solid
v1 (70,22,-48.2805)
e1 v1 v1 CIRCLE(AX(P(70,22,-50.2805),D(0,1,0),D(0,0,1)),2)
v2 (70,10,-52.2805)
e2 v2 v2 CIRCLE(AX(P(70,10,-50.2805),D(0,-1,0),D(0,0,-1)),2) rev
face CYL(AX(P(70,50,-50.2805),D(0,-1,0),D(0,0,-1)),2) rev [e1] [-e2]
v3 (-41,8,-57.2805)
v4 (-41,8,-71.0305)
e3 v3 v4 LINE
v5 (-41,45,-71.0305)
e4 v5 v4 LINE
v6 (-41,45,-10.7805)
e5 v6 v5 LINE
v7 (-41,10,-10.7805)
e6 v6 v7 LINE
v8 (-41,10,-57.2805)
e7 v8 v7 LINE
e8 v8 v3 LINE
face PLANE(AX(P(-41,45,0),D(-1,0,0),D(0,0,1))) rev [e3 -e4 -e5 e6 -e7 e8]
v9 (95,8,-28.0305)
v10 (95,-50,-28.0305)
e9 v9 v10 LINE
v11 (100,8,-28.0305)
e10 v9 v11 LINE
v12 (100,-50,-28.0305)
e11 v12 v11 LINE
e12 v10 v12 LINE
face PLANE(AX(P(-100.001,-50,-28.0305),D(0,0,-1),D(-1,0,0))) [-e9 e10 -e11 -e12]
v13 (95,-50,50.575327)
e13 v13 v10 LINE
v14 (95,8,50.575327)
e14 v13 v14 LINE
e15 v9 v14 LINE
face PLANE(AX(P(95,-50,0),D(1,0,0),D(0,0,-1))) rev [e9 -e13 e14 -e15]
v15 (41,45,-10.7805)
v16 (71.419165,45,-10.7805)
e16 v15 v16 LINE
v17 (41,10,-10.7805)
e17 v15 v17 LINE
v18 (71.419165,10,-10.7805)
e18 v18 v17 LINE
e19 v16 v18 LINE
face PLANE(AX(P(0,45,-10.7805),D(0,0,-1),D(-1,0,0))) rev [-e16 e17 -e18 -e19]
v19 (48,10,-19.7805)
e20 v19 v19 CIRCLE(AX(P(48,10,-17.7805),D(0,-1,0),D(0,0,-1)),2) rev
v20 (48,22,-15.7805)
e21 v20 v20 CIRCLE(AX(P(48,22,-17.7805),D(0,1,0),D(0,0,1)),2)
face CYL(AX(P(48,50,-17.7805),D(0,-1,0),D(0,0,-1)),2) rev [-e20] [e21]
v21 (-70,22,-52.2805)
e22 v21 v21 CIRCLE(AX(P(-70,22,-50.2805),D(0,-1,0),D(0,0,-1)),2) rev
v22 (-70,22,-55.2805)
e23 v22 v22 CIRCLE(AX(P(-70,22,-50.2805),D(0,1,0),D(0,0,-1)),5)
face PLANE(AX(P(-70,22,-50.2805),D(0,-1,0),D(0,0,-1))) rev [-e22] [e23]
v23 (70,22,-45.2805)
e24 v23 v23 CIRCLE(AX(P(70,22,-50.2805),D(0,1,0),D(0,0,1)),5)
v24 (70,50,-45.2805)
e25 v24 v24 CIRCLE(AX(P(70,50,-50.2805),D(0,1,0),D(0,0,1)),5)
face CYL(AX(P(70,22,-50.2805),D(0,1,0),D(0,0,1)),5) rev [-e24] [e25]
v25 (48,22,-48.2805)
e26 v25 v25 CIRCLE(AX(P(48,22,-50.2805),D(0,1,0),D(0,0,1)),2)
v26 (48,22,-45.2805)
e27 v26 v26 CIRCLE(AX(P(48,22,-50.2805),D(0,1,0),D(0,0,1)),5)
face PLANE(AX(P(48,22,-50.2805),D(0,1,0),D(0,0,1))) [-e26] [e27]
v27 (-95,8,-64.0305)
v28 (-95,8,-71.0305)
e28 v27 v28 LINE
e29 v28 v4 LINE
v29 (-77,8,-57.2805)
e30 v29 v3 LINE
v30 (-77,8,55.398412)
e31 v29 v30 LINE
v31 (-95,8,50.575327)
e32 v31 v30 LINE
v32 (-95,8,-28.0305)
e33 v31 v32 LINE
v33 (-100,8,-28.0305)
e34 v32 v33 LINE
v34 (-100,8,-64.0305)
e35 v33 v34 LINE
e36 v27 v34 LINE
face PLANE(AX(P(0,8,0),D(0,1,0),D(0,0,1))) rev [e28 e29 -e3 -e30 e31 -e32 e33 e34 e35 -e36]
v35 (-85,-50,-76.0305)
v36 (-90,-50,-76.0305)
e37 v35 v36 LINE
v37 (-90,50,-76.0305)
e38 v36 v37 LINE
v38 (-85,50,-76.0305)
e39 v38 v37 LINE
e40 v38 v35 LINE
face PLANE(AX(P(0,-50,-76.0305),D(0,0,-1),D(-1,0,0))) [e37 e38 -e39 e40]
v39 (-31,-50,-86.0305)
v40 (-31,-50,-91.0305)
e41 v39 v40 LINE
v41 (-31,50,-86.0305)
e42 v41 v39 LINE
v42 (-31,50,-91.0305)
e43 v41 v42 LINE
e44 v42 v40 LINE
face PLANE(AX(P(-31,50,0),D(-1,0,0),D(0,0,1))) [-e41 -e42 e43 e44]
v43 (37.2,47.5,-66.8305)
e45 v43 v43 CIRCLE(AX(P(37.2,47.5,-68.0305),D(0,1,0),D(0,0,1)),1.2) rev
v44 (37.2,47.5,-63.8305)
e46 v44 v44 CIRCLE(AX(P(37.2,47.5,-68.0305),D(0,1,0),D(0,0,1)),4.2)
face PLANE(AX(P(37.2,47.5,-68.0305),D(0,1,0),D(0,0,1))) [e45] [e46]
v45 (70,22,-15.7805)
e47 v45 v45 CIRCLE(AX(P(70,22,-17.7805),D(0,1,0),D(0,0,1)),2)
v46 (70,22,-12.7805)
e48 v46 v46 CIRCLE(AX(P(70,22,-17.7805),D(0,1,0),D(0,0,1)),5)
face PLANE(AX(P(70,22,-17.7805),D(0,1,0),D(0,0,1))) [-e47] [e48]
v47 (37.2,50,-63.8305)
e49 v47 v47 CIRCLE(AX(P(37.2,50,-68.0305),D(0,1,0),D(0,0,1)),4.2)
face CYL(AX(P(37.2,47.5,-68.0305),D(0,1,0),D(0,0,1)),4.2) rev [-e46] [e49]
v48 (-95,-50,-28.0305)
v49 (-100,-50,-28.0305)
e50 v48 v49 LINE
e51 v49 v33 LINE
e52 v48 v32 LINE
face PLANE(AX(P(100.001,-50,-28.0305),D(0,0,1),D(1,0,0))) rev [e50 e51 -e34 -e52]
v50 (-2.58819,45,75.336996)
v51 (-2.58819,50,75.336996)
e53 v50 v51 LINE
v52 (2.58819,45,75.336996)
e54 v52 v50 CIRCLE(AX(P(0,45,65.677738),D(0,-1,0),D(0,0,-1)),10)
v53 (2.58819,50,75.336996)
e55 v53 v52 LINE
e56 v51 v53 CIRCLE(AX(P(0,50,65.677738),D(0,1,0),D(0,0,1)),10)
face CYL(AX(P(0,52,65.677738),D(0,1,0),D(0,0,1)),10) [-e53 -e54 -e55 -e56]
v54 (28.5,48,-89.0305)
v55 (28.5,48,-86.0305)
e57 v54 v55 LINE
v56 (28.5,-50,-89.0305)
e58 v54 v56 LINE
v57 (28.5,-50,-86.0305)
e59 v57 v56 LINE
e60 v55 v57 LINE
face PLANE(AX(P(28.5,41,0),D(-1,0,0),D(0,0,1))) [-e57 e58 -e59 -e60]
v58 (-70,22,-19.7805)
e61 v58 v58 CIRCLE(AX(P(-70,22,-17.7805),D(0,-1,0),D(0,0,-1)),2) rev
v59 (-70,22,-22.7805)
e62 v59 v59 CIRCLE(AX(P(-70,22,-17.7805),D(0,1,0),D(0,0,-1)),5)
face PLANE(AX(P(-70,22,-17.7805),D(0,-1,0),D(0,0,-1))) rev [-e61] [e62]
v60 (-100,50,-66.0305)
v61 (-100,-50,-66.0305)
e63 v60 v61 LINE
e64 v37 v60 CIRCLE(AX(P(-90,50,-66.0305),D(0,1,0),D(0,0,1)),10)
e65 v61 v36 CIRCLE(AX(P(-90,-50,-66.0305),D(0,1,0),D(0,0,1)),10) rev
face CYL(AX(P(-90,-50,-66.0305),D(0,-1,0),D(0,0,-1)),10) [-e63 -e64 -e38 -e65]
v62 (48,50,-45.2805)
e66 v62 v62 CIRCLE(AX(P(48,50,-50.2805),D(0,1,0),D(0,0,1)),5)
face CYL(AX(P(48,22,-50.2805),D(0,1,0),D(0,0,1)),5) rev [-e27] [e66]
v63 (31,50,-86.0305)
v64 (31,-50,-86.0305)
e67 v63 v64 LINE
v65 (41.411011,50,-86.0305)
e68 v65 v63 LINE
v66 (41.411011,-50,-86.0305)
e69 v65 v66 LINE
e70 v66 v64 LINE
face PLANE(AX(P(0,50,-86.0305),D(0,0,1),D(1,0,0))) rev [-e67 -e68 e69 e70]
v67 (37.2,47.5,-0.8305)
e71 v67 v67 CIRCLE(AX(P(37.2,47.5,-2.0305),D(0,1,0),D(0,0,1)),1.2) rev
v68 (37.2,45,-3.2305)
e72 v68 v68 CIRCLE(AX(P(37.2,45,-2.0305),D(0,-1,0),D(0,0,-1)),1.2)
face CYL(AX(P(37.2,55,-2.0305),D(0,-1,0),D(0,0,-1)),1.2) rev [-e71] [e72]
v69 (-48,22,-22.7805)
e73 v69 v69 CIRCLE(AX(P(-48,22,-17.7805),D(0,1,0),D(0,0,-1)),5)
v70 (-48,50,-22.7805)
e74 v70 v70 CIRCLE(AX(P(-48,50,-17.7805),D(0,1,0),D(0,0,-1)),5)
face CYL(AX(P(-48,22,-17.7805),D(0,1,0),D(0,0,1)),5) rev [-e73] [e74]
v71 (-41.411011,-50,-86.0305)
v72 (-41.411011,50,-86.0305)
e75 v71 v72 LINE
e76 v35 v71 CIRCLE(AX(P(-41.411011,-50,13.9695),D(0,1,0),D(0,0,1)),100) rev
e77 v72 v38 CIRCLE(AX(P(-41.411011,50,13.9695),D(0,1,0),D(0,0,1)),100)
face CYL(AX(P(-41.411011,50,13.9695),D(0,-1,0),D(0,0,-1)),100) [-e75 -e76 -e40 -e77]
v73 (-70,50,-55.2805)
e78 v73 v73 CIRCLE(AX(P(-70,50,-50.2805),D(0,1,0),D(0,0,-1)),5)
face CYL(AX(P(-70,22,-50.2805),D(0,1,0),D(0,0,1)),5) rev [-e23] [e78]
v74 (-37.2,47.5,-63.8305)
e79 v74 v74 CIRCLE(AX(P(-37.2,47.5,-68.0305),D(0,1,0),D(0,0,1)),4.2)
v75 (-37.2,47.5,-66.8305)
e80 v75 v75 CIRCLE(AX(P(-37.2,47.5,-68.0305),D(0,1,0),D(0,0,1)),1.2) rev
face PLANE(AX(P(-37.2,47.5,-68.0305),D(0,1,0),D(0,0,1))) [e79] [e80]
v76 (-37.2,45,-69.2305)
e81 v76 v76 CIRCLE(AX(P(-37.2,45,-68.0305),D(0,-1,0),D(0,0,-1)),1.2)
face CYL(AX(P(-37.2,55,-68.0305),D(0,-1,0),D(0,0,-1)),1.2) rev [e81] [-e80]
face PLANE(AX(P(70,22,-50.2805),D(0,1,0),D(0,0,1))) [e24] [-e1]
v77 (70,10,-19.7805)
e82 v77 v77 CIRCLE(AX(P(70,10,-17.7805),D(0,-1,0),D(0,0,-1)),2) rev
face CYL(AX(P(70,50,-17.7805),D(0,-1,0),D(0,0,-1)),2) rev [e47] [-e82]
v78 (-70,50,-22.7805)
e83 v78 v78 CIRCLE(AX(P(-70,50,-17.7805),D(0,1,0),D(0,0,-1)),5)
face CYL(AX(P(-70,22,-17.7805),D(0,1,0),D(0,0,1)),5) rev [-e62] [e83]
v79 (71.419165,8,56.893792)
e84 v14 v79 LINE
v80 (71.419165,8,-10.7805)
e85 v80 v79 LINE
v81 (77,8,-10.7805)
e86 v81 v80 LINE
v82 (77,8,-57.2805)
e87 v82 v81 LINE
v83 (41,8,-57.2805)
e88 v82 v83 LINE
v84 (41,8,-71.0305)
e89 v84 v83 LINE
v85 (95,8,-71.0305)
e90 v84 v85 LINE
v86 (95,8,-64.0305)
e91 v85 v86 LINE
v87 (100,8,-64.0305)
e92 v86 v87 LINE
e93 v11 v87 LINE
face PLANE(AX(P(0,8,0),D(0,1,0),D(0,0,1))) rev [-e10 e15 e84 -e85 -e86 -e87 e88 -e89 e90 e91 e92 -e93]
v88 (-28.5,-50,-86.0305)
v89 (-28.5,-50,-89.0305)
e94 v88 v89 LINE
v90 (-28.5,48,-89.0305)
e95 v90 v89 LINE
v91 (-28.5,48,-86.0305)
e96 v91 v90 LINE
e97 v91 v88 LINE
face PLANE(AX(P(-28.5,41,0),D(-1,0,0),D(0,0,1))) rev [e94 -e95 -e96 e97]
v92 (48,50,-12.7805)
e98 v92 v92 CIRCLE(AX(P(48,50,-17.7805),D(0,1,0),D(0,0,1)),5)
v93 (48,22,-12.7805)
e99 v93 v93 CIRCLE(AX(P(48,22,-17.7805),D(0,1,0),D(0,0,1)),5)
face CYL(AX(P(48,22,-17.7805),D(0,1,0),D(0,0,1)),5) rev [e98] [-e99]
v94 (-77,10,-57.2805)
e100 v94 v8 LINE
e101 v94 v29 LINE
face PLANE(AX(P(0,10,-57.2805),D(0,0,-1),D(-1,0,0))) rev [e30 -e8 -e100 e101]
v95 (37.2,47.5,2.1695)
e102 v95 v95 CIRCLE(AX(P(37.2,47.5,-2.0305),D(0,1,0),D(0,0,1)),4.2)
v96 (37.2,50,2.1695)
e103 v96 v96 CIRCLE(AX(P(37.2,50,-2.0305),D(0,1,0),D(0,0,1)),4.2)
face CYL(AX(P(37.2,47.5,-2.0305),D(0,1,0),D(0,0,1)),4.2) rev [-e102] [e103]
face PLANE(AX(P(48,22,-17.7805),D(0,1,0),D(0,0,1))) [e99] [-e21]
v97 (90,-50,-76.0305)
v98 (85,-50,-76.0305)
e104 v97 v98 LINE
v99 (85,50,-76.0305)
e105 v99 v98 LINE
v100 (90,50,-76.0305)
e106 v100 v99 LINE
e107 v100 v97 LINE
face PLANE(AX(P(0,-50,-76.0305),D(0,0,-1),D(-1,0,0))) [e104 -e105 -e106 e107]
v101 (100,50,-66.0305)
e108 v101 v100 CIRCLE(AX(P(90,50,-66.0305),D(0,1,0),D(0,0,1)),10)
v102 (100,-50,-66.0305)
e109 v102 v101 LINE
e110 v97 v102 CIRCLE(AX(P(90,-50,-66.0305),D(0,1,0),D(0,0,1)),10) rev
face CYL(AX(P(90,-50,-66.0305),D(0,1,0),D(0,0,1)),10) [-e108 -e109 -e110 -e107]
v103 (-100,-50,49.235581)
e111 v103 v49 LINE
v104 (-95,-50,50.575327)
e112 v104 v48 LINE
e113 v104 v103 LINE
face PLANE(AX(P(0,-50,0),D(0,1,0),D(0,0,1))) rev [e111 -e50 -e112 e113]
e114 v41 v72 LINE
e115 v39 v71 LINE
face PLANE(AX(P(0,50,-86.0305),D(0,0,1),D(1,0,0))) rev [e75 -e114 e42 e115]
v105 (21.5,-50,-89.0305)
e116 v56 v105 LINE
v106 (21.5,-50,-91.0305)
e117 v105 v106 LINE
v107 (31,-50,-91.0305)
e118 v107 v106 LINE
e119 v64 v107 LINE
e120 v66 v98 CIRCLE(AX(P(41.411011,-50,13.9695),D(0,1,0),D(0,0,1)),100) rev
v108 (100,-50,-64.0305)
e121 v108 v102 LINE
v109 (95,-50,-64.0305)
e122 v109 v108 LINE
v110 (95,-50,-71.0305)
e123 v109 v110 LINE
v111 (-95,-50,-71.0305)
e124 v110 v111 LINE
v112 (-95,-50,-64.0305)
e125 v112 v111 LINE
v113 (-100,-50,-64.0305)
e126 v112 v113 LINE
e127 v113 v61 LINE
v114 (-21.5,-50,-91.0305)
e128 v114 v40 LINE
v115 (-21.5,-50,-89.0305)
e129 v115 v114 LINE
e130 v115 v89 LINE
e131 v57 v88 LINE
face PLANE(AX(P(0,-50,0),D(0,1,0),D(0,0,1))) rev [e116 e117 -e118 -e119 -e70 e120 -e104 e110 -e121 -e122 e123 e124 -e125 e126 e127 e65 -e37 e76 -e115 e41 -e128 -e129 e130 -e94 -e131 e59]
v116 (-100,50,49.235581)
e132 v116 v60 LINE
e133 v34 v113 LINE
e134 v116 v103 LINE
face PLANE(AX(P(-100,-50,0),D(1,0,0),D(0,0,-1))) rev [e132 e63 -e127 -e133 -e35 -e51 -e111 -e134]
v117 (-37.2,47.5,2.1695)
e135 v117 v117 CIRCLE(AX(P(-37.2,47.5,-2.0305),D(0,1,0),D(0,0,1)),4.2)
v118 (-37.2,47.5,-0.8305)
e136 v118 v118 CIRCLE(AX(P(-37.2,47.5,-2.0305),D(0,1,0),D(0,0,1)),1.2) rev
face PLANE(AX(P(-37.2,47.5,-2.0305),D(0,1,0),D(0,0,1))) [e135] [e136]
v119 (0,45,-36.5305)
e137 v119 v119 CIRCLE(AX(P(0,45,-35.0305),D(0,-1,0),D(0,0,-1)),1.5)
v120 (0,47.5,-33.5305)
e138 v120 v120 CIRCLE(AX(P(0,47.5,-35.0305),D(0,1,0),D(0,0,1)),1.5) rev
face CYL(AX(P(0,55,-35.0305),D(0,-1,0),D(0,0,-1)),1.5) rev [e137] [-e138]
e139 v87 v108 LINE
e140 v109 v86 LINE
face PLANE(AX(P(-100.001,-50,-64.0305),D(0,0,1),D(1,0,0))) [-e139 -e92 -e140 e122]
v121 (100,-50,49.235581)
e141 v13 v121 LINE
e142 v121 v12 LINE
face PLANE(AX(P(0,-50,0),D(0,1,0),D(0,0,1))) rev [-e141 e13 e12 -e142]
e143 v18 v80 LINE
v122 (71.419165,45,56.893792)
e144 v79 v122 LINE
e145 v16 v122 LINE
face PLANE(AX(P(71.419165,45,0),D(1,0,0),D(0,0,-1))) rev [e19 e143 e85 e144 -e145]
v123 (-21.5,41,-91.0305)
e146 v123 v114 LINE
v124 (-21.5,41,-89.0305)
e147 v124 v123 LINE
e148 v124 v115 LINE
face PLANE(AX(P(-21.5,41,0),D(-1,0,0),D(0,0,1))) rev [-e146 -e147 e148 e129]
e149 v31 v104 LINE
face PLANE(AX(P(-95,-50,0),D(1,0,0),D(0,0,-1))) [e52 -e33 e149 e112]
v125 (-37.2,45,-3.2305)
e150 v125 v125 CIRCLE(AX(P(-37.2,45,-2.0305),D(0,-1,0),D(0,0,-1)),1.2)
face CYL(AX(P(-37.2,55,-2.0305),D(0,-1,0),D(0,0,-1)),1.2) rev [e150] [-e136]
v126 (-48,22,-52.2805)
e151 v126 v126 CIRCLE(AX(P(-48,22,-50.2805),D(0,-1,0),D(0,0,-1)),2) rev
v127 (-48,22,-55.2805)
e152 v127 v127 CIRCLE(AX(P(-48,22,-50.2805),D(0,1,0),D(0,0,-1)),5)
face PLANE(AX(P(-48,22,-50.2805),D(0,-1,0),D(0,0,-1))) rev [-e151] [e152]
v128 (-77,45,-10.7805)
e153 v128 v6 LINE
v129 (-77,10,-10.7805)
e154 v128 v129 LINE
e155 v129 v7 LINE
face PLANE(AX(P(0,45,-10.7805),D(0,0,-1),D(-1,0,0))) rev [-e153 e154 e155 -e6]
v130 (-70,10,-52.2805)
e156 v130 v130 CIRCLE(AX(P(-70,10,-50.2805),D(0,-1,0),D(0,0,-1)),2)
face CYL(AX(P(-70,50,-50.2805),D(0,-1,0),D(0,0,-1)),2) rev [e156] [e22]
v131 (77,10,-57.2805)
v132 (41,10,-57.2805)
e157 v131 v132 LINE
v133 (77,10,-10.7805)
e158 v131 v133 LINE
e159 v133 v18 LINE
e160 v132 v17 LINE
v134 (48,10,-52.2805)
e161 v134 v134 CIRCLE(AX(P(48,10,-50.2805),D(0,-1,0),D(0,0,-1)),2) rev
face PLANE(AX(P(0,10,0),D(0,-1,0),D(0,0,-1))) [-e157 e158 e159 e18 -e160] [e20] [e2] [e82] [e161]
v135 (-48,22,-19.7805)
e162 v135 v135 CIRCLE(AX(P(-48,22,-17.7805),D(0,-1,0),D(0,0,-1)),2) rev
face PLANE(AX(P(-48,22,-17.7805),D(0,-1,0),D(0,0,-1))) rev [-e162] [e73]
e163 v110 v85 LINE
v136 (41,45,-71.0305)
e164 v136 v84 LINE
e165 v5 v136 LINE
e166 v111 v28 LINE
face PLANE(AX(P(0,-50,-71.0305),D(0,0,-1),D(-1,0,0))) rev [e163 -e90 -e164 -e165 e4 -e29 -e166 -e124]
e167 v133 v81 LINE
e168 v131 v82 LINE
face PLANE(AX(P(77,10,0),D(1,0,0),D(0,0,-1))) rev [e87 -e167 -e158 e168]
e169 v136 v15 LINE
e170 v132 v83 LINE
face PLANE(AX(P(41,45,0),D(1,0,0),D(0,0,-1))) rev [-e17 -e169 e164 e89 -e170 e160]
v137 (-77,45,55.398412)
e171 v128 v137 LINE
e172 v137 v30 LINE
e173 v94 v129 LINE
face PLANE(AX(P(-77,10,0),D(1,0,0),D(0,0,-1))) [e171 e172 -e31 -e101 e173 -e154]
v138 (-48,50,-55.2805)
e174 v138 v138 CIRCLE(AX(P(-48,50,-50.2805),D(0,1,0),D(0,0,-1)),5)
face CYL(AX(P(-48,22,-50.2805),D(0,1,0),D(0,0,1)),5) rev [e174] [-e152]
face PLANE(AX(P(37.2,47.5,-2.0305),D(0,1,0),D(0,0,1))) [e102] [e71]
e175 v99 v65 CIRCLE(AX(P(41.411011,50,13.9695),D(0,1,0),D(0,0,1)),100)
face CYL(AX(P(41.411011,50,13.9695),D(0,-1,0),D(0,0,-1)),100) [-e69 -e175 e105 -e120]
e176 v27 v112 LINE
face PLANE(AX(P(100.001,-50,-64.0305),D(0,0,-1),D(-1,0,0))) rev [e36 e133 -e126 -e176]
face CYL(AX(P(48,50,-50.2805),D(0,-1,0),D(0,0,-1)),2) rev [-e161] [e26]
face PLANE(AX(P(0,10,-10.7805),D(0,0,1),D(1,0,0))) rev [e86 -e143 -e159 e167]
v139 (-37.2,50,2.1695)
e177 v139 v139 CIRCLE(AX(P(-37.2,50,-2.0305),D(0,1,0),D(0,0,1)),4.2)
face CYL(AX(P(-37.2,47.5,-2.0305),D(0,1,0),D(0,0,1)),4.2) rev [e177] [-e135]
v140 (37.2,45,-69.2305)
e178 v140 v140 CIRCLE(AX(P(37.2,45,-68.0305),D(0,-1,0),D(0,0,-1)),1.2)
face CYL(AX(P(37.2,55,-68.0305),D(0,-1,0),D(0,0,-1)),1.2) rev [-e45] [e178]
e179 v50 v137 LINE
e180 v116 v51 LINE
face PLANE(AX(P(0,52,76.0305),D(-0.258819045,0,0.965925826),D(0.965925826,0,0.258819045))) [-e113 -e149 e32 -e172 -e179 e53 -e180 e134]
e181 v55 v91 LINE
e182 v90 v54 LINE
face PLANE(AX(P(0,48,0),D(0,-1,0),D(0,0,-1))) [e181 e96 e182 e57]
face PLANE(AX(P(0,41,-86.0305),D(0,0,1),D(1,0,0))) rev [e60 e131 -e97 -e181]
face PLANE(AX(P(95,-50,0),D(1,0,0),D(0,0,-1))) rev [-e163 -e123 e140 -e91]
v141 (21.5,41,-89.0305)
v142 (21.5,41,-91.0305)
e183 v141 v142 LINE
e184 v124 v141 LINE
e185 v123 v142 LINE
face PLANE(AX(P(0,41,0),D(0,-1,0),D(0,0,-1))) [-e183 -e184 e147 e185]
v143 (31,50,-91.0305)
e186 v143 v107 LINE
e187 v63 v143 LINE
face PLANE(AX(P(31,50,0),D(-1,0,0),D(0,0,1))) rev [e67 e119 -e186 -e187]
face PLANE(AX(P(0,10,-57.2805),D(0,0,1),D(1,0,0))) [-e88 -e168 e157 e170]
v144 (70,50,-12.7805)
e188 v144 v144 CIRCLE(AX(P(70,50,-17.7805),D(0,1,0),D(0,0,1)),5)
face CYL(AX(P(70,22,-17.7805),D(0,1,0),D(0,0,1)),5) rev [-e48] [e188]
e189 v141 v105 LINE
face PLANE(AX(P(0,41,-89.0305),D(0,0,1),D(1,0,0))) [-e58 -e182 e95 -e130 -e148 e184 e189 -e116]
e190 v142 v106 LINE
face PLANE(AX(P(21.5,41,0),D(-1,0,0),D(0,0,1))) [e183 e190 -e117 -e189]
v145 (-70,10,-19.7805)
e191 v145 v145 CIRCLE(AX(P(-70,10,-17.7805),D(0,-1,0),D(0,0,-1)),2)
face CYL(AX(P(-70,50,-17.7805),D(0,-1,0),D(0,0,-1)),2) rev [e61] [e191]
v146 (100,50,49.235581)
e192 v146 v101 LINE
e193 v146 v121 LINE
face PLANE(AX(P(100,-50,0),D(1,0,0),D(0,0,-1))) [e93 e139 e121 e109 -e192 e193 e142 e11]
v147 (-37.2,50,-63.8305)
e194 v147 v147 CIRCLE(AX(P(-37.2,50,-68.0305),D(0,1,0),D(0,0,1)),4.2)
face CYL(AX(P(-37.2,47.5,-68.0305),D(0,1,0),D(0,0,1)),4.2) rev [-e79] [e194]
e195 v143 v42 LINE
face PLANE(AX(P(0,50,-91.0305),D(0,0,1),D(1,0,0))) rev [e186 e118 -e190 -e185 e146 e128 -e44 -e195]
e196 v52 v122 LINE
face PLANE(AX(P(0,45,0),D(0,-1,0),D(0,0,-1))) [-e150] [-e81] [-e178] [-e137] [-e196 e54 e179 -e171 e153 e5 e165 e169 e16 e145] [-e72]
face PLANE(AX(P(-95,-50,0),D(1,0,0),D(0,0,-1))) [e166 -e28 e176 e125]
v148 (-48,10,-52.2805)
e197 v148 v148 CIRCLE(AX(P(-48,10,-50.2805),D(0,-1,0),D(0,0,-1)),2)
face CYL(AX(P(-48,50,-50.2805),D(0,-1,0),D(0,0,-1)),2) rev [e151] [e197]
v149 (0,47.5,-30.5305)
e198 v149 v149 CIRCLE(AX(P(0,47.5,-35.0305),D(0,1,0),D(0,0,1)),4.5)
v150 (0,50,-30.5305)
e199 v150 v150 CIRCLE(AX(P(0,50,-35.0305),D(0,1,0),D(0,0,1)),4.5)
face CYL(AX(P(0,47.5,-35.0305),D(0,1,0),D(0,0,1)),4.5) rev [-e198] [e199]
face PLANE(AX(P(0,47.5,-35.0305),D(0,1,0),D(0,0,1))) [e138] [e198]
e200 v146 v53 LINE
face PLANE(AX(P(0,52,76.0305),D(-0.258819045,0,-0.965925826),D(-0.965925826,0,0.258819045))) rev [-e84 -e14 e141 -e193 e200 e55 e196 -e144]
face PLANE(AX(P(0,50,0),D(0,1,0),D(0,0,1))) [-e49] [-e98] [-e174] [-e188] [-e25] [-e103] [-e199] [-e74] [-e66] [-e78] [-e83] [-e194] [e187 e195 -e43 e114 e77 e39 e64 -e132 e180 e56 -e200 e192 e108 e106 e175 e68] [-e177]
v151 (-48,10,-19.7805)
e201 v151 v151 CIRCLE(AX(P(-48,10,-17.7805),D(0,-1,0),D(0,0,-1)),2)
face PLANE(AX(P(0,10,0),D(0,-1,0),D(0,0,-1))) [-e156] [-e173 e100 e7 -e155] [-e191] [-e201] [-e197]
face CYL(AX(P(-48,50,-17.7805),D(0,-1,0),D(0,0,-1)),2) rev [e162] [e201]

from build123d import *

# Parameters (mm, degrees)
BOSS_EXTRUDE1_DEPTH      = 50
BOSS_EXTRUDE1_DEPTH_BACK = 50
SKETCH1_W                = 200
SKETCH1_H                = 152.061
SHELL1_T                 = -5
SKETCH3_W                = 190
SKETCH3_H                = 142.061
BOSS_EXTRUDE2_DEPTH      = 37
CUT_EXTRUDE1_REACH       = 221.729
SKETCH2_W                = 36
SKETCH2_H                = 58
SKETCH4_W                = 36
SKETCH4_H                = 46.5
SKETCH4_R                = 2
CUT_EXTRUDE2_DEPTH       = 2
SKETCH4_3_R              = 2
CUT_EXTRUDE3_DEPTH       = 139.364146115
SKETCH5_W                = 169.952904784
SKETCH5_H                = 5
CUT_EXTRUDE4_DEPTH       = 63
CUT_EXTRUDE5_START       = -37
CUT_EXTRUDE5_DEPTH       = 37
SKETCH9_R                = 1.2
SKETCH9_R_2              = 1.5
CUT_EXTRUDE6_DEPTH       = 10
CUT_EXTRUDE7_DEPTH       = 102
FILLET1_R                = 10
SKETCH11_W               = 62
SKETCH11_H               = 5
BOSS_EXTRUDE3_DEPTH      = 100
SKETCH12_W               = 57
SKETCH12_H               = 3
SKETCH12_W_2             = 43
SKETCH12_H_2             = 2
CUT_EXTRUDE8_DEPTH       = 91
SKETCH13_W               = 57
SKETCH13_H               = 3
CUT_EXTRUDE9_DEPTH       = 7
FILLET2_R                = 10
FILLET3_R                = 100
SKETCH15_R               = 5
CUT_EXTRUDE10_DEPTH      = 28
SKETCH17_R               = 4.2
SKETCH17_R_2             = 4.5
CUT_EXTRUDE11_DEPTH      = 2.5


# Read off the part's stored shape, not the designer's step: Cut-Extrude5
with BuildPart() as part:
    # Sketch1 → Boss-Extrude1 (new, two sides: drawn at the far end of the back side and taken through both)
    with BuildSketch(Plane(origin=(0, 0, 0), x_dir=(1, 0, 0), z_dir=(0, 1, 0)).offset(-BOSS_EXTRUDE1_DEPTH_BACK)):
        Rectangle(SKETCH1_W, SKETCH1_H)
    extrude(amount=BOSS_EXTRUDE1_DEPTH + BOSS_EXTRUDE1_DEPTH_BACK)

    # Shell1
    shell1_openings = [part.faces().sort_by_distance(p)[0] for p in [
        (0, -50, 0),
    ]]
    offset(amount=SHELL1_T, openings=shell1_openings, kind=Kind.INTERSECTION)

    # Sketch3 → Boss-Extrude2 (add)
    with BuildSketch(Plane.XZ.offset(-45)):
        Rectangle(SKETCH3_W, SKETCH3_H)
    extrude(amount=BOSS_EXTRUDE2_DEPTH)

    # Sketch2 → Cut-Extrude1 (cut, up to next)
    with BuildSketch(Plane.ZY.offset(100), mode=Mode.PRIVATE) as cut_extrude1_sk1:
        with Locations((-46.0305, -21)):
            Rectangle(SKETCH2_W, SKETCH2_H)
    cut_extrude1_tool1 = extrude(cut_extrude1_sk1.sketch, amount=-CUT_EXTRUDE1_REACH, mode=Mode.PRIVATE) & part.part
    cut_extrude1 = cut_extrude1_tool1.solids().sort_by_distance((-100, -21, -46.0305))[0]
    add(cut_extrude1, mode=Mode.SUBTRACT)

    # Mirror1: Cut-Extrude1 across plane
    add(cut_extrude1.mirror(Plane(origin=(0, 0, 0), x_dir=(0, 0, 1), z_dir=(1, 0, 0))), mode=Mode.SUBTRACT)

    # Sketch4 → Cut-Extrude2 (cut)
    with BuildSketch(Plane.XZ.offset(-8)):
        with Locations((-59, -34.0305)):
            Rectangle(SKETCH4_W, SKETCH4_H)
        with Locations(Location((-48, -50.2805, 0), (0, 0, 270))):
            Circle(SKETCH4_R, mode=Mode.SUBTRACT)
        with Locations(Location((-70, -50.2805, 0), (0, 0, 270))):
            Circle(SKETCH4_R, mode=Mode.SUBTRACT)
        with Locations(Location((-48, -17.7805, 0), (0, 0, 270))):
            Circle(SKETCH4_R, mode=Mode.SUBTRACT)
        with Locations(Location((-70, -17.7805, 0), (0, 0, 270))):
            Circle(SKETCH4_R, mode=Mode.SUBTRACT)
    cut_extrude2 = extrude(amount=-CUT_EXTRUDE2_DEPTH, mode=Mode.SUBTRACT)

    # Sketch4<3> → Cut-Extrude3 (cut, through all)
    with BuildSketch(Plane.XZ.offset(-8)):
        with BuildLine():
            Line((-70, -19.7805), (-70, -17.7805))
            Line((-70, -17.7805), (-68, -17.7805))
            ThreePointArc((-68, -17.7805), (-71.414213562, -16.366286438), (-70, -19.7805))
        make_face()
        with BuildLine():
            Line((-68, -17.7805), (-70, -17.7805))
            Line((-70, -17.7805), (-70, -19.7805))
            ThreePointArc((-70, -19.7805), (-68.585786438, -19.194713562), (-68, -17.7805))
        make_face()
        with Locations(Location((-48, -17.7805, 0), (0, 0, 270))):
            Circle(SKETCH4_3_R)
        with Locations(Location((-70, -50.2805, 0), (0, 0, 270))):
            Circle(SKETCH4_3_R)
        with Locations(Location((-48, -50.2805, 0), (0, 0, 270))):
            Circle(SKETCH4_3_R)
    cut_extrude3 = extrude(amount=-CUT_EXTRUDE3_DEPTH, mode=Mode.SUBTRACT)

    # Mirror2: Cut-Extrude2, Cut-Extrude3 across plane
    add(cut_extrude2.mirror(Plane(origin=(0, 0, 0), x_dir=(0, 0, 1), z_dir=(1, 0, 0))), mode=Mode.SUBTRACT)
    add(cut_extrude3.mirror(Plane(origin=(0, 0, 0), x_dir=(0, 0, 1), z_dir=(1, 0, 0))), mode=Mode.SUBTRACT)

    # Sketch5 → Cut-Extrude4 (cut)
    with BuildSketch(Plane.XZ.offset(-8)):
        with Locations((10.023547608, 73.5305)):
            Rectangle(SKETCH5_W, SKETCH5_H)
    extrude(amount=CUT_EXTRUDE4_DEPTH, mode=Mode.SUBTRACT)

    # Cut-Extrude5 outline → Cut-Extrude5 (cut)
    with BuildSketch(Plane.XZ.offset(-8).offset(CUT_EXTRUDE5_START)):
        Polygon((-41, -10.7805), (-41, -71.0305), (41, -71.0305), (41, -10.7805), (71.419165144, -10.7805), (71.419165144, 76.0305), (-74.952904784, 76.0305), (-74.952904784, 71.0305), (-77, 71.0305), (-77, -10.7805), align=None)
    extrude(amount=CUT_EXTRUDE5_DEPTH, mode=Mode.SUBTRACT)

    # Sketch9 → Cut-Extrude6 (cut)
    with BuildSketch(Plane.XZ.offset(-45)):
        with Locations(Location((37.2, -68.0305, 0), (0, 0, 270))):
            Circle(SKETCH9_R)
        with Locations(Location((-37.2, -68.0305, 0), (0, 0, 270))):
            Circle(SKETCH9_R)
        with Locations(Location((37.2, -2.0305, 0), (0, 0, 270))):
            Circle(SKETCH9_R)
        with Locations(Location((-37.2, -2.0305, 0), (0, 0, 270))):
            Circle(SKETCH9_R)
        with Locations(Location((0, -35.0305, 0), (0, 0, 270))):
            Circle(SKETCH9_R_2)
    extrude(amount=-CUT_EXTRUDE6_DEPTH, mode=Mode.SUBTRACT)

    # Sketch10 → Cut-Extrude7 (cut)
    with BuildSketch(Plane.XZ.offset(50)):
        Polygon((0, 76.0305), (100, 49.235580757), (100, 76.0305), align=None)
    cut_extrude7 = extrude(amount=-CUT_EXTRUDE7_DEPTH, mode=Mode.SUBTRACT)

    # Mirror3: Cut-Extrude7 across plane
    add(cut_extrude7.mirror(Plane(origin=(0, 0, 0), x_dir=(0, 0, 1), z_dir=(1, 0, 0))), mode=Mode.SUBTRACT)

    # Fillet1
    fillet1_edges = [part.edges().sort_by_distance(p)[0] for p in [
        (0, 47.5, 76.0305),
    ]]
    fillet(fillet1_edges, radius=FILLET1_R)

    # Sketch11 → Boss-Extrude3 (add)
    with BuildSketch(Plane.XZ.offset(50)):
        Polygon((85, -86.0305), (85, -76.0305), (-85, -76.0305), (-85, -86.0305), (-31, -86.0305), (31, -86.0305), align=None)
        with Locations((0, -88.5305)):
            Rectangle(SKETCH11_W, SKETCH11_H)
    extrude(amount=-BOSS_EXTRUDE3_DEPTH)

    # Sketch12 → Cut-Extrude8 (cut)
    with BuildSketch(Plane.XZ.offset(50)):
        with Locations((0, -87.5305)):
            Rectangle(SKETCH12_W, SKETCH12_H)
        with Locations((0, -90.0305)):
            Rectangle(SKETCH12_W_2, SKETCH12_H_2)
    extrude(amount=-CUT_EXTRUDE8_DEPTH, mode=Mode.SUBTRACT)

    # Sketch13 → Cut-Extrude9 (cut)
    with BuildSketch(Plane.XZ.offset(-41)):
        with Locations((0, -87.5305)):
            Rectangle(SKETCH13_W, SKETCH13_H)
    extrude(amount=-CUT_EXTRUDE9_DEPTH, mode=Mode.SUBTRACT)

    # Fillet2
    fillet2_edges = [part.edges().sort_by_distance(p)[0] for p in [
        (-100, 0, -76.0305),
        (100, 0, -76.0305),
    ]]
    fillet(fillet2_edges, radius=FILLET2_R)

    # Fillet3
    # the kernel refuses this fillet: 100 mm, written as the material it takes off along each edge
    with BuildSketch(Plane(origin=(-85, -158.972473589, -86.0305), x_dir=(0, 0, 1), z_dir=(0, 1, 0))) as fillet3_piece_1:
        with BuildLine():
            CenterArc((100, 43.588989435), FILLET3_R, 180, 25.841932763)
            Line((0, 43.588989435), (-2, 43.588989435))
            Line((-2, 43.588989435), (-2, 0))
            Line((-2, 0), (0, -2))
            ThreePointArc((0, -2), (5, -2), (8.2, -0.871779789))
            Line((8.2, -0.871779789), (10, 0))
        make_face()
    extrude(amount=317.944947177, mode=Mode.SUBTRACT)
    with BuildSketch(Plane(origin=(85, -158.972473589, -86.0305), x_dir=(0, 0, 1), z_dir=(0, 1, 0))) as fillet3_piece_2:
        with BuildLine():
            CenterArc((100, -43.588989435), FILLET3_R, 154.158067237, 25.841932763)
            Line((0, -43.588989435), (-2, -43.588989435))
            Line((-2, -43.588989435), (-2, 0))
            Line((-2, 0), (0, 2))
            ThreePointArc((0, 2), (5, 2), (8.2, 0.871779789))
            Line((8.2, 0.871779789), (10, 0))
        make_face()
    extrude(amount=317.944947177, mode=Mode.SUBTRACT)

    # Sketch15 → Cut-Extrude10 (cut)
    with BuildSketch(Plane(origin=(0, 50, 0), x_dir=(1, 0, 0), z_dir=(0, 1, 0))):
        with Locations(Location((70, 17.7805, 0), (0, 0, 270))):
            Circle(SKETCH15_R)
        with Locations(Location((48, 17.7805, 0), (0, 0, 270))):
            Circle(SKETCH15_R)
        with Locations(Location((70, 50.2805, 0), (0, 0, 270))):
            Circle(SKETCH15_R)
        with Locations(Location((-48, 50.2805, 0), (0, 0, 90))):
            Circle(SKETCH15_R)
        with Locations(Location((48, 50.2805, 0), (0, 0, 270))):
            Circle(SKETCH15_R)
        with Locations(Location((-70, 50.2805, 0), (0, 0, 90))):
            Circle(SKETCH15_R)
        with Locations(Location((-48, 17.7805, 0), (0, 0, 90))):
            Circle(SKETCH15_R)
        with Locations(Location((-70, 17.7805, 0), (0, 0, 90))):
            Circle(SKETCH15_R)
    extrude(amount=-CUT_EXTRUDE10_DEPTH, mode=Mode.SUBTRACT)

    # Sketch17 → Cut-Extrude11 (cut)
    with BuildSketch(Plane(origin=(0, 50, 0), x_dir=(1, 0, 0), z_dir=(0, 1, 0))):
        with Locations(Location((-37.2, 2.0305, 0), (0, 0, 270))):
            Circle(SKETCH17_R)
        with Locations(Location((37.2, 68.0305, 0), (0, 0, 270))):
            Circle(SKETCH17_R)
        with Locations(Location((37.2, 2.0305, 0), (0, 0, 270))):
            Circle(SKETCH17_R)
        with Locations(Location((-37.2, 68.0305, 0), (0, 0, 270))):
            Circle(SKETCH17_R)
        with Locations(Location((0, 35.0305, 0), (0, 0, 270))):
            Circle(SKETCH17_R_2)
    extrude(amount=-CUT_EXTRUDE11_DEPTH, mode=Mode.SUBTRACT)


solid = part.part
